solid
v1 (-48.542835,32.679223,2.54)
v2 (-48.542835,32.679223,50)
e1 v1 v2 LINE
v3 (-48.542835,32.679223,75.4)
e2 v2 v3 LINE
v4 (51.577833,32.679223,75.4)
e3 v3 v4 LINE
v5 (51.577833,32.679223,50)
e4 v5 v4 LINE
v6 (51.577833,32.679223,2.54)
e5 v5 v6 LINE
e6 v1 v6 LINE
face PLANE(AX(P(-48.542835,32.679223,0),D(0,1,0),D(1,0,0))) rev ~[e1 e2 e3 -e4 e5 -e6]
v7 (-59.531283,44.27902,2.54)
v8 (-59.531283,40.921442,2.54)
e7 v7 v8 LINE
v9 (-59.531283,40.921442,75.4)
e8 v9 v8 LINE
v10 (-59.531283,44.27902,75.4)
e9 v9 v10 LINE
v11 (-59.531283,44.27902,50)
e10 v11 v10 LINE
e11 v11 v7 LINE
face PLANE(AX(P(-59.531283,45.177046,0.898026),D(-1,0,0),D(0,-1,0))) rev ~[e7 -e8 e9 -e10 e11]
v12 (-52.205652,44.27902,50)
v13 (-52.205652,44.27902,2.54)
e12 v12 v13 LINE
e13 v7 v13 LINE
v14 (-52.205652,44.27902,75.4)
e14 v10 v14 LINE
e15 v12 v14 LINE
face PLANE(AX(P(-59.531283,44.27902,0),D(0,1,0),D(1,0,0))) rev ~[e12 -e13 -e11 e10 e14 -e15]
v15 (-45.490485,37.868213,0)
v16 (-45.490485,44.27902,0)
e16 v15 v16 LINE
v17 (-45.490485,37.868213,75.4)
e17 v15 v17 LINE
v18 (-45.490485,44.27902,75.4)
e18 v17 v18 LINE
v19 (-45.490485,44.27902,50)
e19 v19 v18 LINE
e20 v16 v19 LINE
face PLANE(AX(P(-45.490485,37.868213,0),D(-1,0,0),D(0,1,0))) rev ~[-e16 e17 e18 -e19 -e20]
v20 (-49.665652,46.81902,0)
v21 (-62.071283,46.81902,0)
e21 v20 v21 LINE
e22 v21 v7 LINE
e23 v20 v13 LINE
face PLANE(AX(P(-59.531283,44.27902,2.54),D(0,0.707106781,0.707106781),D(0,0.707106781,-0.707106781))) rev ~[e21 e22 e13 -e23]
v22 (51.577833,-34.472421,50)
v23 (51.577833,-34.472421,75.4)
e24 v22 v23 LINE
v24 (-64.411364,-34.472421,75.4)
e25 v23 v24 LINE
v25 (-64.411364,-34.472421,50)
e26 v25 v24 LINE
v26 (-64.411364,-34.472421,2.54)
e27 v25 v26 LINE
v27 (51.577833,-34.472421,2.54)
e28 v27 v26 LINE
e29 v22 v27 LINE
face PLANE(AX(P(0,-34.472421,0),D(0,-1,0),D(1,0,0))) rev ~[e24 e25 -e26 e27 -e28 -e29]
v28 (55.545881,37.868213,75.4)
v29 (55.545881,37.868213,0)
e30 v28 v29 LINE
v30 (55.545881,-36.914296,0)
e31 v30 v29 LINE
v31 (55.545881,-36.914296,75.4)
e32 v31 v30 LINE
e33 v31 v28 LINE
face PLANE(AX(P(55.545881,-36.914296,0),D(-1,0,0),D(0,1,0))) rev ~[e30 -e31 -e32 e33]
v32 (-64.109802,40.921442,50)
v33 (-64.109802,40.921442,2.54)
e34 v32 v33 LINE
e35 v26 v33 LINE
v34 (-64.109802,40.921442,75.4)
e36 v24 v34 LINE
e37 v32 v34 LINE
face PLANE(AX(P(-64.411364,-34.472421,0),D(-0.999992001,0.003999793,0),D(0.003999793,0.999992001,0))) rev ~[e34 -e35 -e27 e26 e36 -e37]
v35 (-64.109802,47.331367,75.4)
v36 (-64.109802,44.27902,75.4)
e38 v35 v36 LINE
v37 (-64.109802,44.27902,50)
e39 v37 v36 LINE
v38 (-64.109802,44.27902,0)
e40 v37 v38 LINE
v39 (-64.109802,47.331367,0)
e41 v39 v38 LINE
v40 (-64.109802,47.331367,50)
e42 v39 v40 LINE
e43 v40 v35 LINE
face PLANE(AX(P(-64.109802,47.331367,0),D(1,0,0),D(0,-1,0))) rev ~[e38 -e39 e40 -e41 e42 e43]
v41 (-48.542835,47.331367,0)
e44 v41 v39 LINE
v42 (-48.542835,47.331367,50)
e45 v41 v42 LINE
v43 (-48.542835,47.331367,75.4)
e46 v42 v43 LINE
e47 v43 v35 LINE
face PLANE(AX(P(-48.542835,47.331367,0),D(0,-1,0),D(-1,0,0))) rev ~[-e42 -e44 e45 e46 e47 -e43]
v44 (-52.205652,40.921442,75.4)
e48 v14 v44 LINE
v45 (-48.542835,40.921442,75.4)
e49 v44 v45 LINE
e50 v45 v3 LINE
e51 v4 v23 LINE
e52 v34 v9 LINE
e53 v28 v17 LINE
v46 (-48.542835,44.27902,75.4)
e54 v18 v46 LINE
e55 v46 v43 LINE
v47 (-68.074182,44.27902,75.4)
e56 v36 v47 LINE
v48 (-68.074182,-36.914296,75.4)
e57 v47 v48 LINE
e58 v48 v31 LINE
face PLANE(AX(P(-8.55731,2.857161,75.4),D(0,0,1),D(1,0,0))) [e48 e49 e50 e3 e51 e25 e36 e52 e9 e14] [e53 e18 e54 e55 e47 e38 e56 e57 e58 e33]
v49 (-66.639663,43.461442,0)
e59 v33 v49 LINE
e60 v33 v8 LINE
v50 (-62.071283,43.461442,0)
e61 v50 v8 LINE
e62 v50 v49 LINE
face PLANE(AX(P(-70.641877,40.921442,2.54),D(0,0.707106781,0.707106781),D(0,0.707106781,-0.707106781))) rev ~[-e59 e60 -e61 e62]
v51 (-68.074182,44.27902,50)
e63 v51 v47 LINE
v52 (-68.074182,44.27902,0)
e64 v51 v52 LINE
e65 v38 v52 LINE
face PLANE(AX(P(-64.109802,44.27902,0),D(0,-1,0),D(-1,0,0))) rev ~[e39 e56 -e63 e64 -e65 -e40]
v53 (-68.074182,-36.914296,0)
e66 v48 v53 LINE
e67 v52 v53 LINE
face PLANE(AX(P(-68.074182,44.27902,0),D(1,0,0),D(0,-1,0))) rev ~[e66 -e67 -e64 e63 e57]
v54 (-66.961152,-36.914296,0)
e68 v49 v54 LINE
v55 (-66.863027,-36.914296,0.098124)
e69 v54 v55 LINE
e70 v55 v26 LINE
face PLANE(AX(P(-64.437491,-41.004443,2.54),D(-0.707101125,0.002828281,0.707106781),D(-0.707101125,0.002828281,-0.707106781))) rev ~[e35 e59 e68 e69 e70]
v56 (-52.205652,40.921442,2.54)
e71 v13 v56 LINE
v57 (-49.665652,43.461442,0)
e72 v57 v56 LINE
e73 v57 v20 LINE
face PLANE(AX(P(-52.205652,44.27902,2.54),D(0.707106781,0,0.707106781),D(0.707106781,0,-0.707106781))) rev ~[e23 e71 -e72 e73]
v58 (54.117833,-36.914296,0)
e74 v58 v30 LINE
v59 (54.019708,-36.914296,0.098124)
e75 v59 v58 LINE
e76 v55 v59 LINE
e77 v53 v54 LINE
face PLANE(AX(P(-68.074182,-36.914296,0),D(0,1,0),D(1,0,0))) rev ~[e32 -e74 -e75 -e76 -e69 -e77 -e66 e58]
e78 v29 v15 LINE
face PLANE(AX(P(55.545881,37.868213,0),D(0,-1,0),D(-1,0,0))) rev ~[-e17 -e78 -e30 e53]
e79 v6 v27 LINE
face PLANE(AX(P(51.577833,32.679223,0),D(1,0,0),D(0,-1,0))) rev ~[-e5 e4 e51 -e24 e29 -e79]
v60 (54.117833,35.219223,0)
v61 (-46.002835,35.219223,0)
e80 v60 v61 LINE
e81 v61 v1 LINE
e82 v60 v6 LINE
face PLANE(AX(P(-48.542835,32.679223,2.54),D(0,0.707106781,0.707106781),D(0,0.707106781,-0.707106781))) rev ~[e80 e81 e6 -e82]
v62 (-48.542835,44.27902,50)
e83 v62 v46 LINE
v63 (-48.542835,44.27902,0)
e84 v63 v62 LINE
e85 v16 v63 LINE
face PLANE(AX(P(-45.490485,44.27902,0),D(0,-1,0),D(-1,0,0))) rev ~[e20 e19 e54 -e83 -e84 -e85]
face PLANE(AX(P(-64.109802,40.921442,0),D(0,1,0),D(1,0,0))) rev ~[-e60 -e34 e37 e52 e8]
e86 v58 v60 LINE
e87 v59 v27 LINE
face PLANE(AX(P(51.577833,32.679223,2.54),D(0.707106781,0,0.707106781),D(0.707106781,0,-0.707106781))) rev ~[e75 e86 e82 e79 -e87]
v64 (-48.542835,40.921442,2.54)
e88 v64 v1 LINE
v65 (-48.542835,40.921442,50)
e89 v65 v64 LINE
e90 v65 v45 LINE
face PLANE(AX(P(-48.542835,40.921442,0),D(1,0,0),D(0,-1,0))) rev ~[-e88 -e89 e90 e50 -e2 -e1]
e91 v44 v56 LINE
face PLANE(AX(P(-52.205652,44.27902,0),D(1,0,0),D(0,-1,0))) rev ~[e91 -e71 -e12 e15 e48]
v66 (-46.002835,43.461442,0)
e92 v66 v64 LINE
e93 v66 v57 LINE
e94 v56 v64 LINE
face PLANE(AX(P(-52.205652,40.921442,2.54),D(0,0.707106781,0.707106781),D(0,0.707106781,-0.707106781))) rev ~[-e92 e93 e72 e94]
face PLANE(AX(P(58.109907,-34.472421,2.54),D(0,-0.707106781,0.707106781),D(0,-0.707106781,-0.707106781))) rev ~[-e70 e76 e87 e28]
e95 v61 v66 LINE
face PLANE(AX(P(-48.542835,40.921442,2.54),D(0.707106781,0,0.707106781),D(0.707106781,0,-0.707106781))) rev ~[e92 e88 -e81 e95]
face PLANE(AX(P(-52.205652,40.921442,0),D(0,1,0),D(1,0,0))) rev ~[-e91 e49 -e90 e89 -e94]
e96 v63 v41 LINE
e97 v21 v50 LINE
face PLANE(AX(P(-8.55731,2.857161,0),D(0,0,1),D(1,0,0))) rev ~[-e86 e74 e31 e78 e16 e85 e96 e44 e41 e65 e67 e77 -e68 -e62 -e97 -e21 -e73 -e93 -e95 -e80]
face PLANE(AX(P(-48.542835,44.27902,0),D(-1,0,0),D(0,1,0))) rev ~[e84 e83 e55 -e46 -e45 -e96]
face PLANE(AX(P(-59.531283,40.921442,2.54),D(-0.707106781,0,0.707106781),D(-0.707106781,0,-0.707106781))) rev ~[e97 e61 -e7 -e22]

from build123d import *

# Parameters (mm, degrees)
F1_DEPTH      = 50
F2_DEPTH      = 25.4
F4_T1_DEPTH   = 7.325630635
F4_T3_DEPTH   = 9.8896528584
F4_T5_DEPTH   = 10.1948919696
F4_T7_DEPTH   = 14.7742944759
F4_T9_DEPTH   = 106.6527421576
F4_T11_DEPTH  = 67.1516433358
F4_T16_DEPTH  = 88.4586156969
F4_T22_DEPTH  = 17.6426691914
F4_T27_DEPTH  = 122.521271835
F4_T33_DEPTH  = 88.4586156969
F4_T38_DEPTH  = 122.521271835
F4_T47_DEPTH  = 88.4586156969
F4_T53_DEPTH  = 11.110594402
F4_T61_DEPTH  = 88.4586156969
F4_T66_DEPTH  = 11.110594402
F4_T74_DEPTH  = 13.8577054245
F4_T79_DEPTH  = 9.8896528584
F4_T87_DEPTH  = 9.8896528584
F4_T92_DEPTH  = 13.8577054245
F4_T100_DEPTH = 14.7742944759
F4_T105_DEPTH = 10.1948919696
F4_T113_DEPTH = 73.6837181253
F4_T118_DEPTH = 106.6527421576
F4_T126_DEPTH = 129.0533466244
F4_T132_DEPTH = 73.6837181253


# Not quite as in the source:
# - a fillet or chamfer that OpenCascade refuses, or shapes differently, is made with other operations: its cross-section is extruded or revolved along the edge and cut away or added
# - a feature of the source that left no trace in its solid (it failed there, or was rolled back) is left out


with BuildPart() as f1:
    # F0 (on Top) → F1 (new body)
    with BuildSketch(Plane.XY):
        Polygon((55.5458813906, -34.4724208117), (55.5458813906, 37.8682129085), (-45.4904846847, 37.8682129085), (-45.4904846847, 44.2790202796), (-48.5428348184, 44.2790202796), (-48.5428348184, 47.331366688), (-64.1098022461, 47.331366688), (-64.1098022461, 44.2790202796), (-68.0741816759, 44.2790202796), (-68.0741816759, 37.8682129085), (-68.0741816759, 32.6792225242), (-68.0741816759, -36.9142964482), (55.5458813906, -36.9142964482), align=None)
        Polygon((-48.5428348184, 32.6792225242), (51.5778325498, 32.6792225242), (51.5778325498, -34.4724208117), (-64.4113644958, -34.4724208117), (-64.1098022461, 40.9214422107), (-59.5312826335, 40.9214422107), (-59.5312826335, 44.2790202796), (-52.2056519985, 44.2790202796), (-52.2056519985, 40.9214422107), (-48.5428348184, 40.9214422107), align=None, mode=Mode.SUBTRACT)
    extrude(amount=F1_DEPTH)

    # F0 (on Top) + F1_face (on face) → F2 (join)
    with BuildSketch(Plane.XY):
        Polygon((55.5458813906, -34.4724208117), (55.5458813906, 37.8682129085), (-45.4904846847, 37.8682129085), (-45.4904846847, 44.2790202796), (-48.5428348184, 44.2790202796), (-48.5428348184, 47.331366688), (-64.1098022461, 47.331366688), (-64.1098022461, 44.2790202796), (-68.0741816759, 44.2790202796), (-68.0741816759, 37.8682129085), (-68.0741816759, 32.6792225242), (-68.0741816759, -36.9142964482), (55.5458813906, -36.9142964482), align=None)
        Polygon((-48.5428348184, 32.6792225242), (51.5778325498, 32.6792225242), (51.5778325498, -34.4724208117), (-64.4113644958, -34.4724208117), (-64.1098022461, 40.9214422107), (-59.5312826335, 40.9214422107), (-59.5312826335, 44.2790202796), (-52.2056519985, 44.2790202796), (-52.2056519985, 40.9214422107), (-48.5428348184, 40.9214422107), align=None, mode=Mode.SUBTRACT)
    with BuildSketch(Plane(origin=(-7.1792836418, 9.1982220042, 50), x_dir=(1, 0, 0), z_dir=(0, 0, 1))):
        Polygon((62.7251650324, -46.1125184524), (62.7251650324, 28.6699909043), (-38.3112010429, 28.6699909043), (-38.3112010429, 35.0807982755), (-41.3635511765, 35.0807982755), (-41.3635511765, 38.1331446838), (-56.9305186042, 38.1331446838), (-56.9305186042, 35.0807982755), (-60.8948980341, 35.0807982755), (-60.8948980341, -46.1125184524), align=None)
        Polygon((-56.9305186042, 31.7232202065), (-52.3519989917, 31.7232202065), (-52.3519989917, 35.0807982755), (-45.0263683567, 35.0807982755), (-45.0263683567, 31.7232202065), (-41.3635511765, 31.7232202065), (-41.3635511765, 23.48100052), (58.7571161917, 23.48100052), (58.7571161917, -43.6706428158), (-57.2320808539, -43.6706428158), align=None, mode=Mode.SUBTRACT)
    extrude(amount=F2_DEPTH)

    # F4: chamfer of 2.54 on 10 edges, made by hand

    # F4_s2 → F4_t1 (cut)
    with BuildSketch(Plane.YZ.offset(-59.5312826335)):
        Polygon((44.2790202796, 2.54), (46.8190202796, 0), (44.2790202796, 0), align=None)
    extrude(amount=F4_T1_DEPTH, mode=Mode.SUBTRACT)

    # F4_s4 → F4_t3 (cut)
    with BuildSketch(Plane.XZ.offset(-44.2790202796)):
        Polygon((-59.5312826335, 2.54), (-62.0712826335, 0), (-59.5312826335, 0), align=None)
        Polygon((-52.2056519985, 2.54), (-49.6656519985, 0), (-52.2056519985, 0), align=None)
    extrude(amount=F4_T3_DEPTH, mode=Mode.SUBTRACT)

    # F4_s6 → F4_t5 (cut)
    with BuildSketch(Plane.YZ.offset(-58.737726788)):
        Polygon((40.9214422107, 2.54), (43.4614422107, 0), (40.9214422107, 0), align=None)
    extrude(amount=F4_T5_DEPTH, mode=Mode.SUBTRACT)

    # F4_s8 → F4_t7 (cut)
    with BuildSketch(Plane.XZ.offset(-40.9214422107)):
        Polygon((-48.5428348184, 2.54), (-46.0028348184, 0), (-48.5428348184, 0), align=None)
    extrude(amount=F4_T7_DEPTH, mode=Mode.SUBTRACT)

    # F4_s10 → F4_t9 (cut)
    with BuildSketch(Plane.YZ.offset(-55.0749096078)):
        Polygon((32.6792225242, 2.54), (35.2192225242, 0), (32.6792225242, 0), align=None)
    extrude(amount=F4_T9_DEPTH, mode=Mode.SUBTRACT)

    # F4_s12 → F4_t11 (cut)
    with BuildSketch(Plane.XZ.offset(-32.6792225242)):
        Polygon((51.5778325498, 2.54), (54.1178325498, 0), (51.5778325498, 0), align=None)
    extrude(amount=F4_T11_DEPTH, mode=Mode.SUBTRACT)


with BuildPart() as f4_tool14:
    # F4_s15 → F4_t16 (new body)
    with BuildSketch(Plane(origin=(-0.1650388622, -41.2615219051, 0), x_dir=(0, 0, 1), z_dir=(0.0039997929, 0.9999920008, 0))):
        Polygon((2.54, -64.2729667124), (0, -66.8129667124), (0, -64.2729667124), align=None)
    extrude(amount=F4_T16_DEPTH)

    split(bisect_by=Plane.XZ.offset(34.4724208117), keep=Keep.BOTTOM)

    split(bisect_by=Plane.XZ.offset(-40.9214422107), keep=Keep.TOP)


with BuildPart() as f1_1:
    add(f1.part)

    # F4_t13: cut F4_tool14
    add(f4_tool14.part, mode=Mode.SUBTRACT)


with BuildPart() as f4_tool20:
    # F4_s21 → F4_t22 (new body)
    with BuildSketch(Plane.YZ.offset(-70.6418770355)):
        Polygon((40.9214422107, 2.54), (43.4614422107, 0), (40.9214422107, 0), align=None)
    extrude(amount=F4_T22_DEPTH)

    split(bisect_by=Plane(origin=(-64.2724525799, 0.2570785554, 0), x_dir=(0, 0, 1), z_dir=(0.9999920008, -0.0039997929, 0)), keep=Keep.TOP)


with BuildPart() as f1_2:
    add(f1_1.part)

    # F4_t19: cut F4_tool20
    add(f4_tool20.part, mode=Mode.SUBTRACT)


with BuildPart() as f4_tool25:
    # F4_s26 → F4_t27 (new body)
    with BuildSketch(Plane.YZ.offset(51.5778325498)):
        Polygon((-34.4724208117, 2.54), (-37.0124208117, 0), (-34.4724208117, 0), align=None)
    extrude(amount=-F4_T27_DEPTH)

    split(bisect_by=Plane(origin=(-64.2724525799, 0.2570785554, 0), x_dir=(0, 0, 1), z_dir=(0.9999920008, -0.0039997929, 0)), keep=Keep.TOP)


with BuildPart() as f1_3:
    add(f1_2.part)

    # F4_t24: cut F4_tool25
    add(f4_tool25.part, mode=Mode.SUBTRACT)


with BuildPart() as f4_tool31:
    # F4_s32 → F4_t33 (new body)
    with BuildSketch(Plane(origin=(-0.1650388622, -41.2615219051, 0), x_dir=(0, 0, 1), z_dir=(0.0039997929, 0.9999920008, 0))):
        Polygon((2.54, -64.2729667124), (0, -66.8129667124), (0, -64.2729667124), align=None)
    extrude(amount=F4_T33_DEPTH)

    split(bisect_by=Plane.XZ.offset(34.4724208117), keep=Keep.TOP)

    split(bisect_by=Plane.XZ.offset(36.9142964482), keep=Keep.BOTTOM)


with BuildPart() as f4_tool36:
    # F4_s37 → F4_t38 (new body)
    with BuildSketch(Plane.YZ.offset(51.5778325498)):
        Polygon((-34.4724208117, 2.54), (-37.0124208117, 0), (-34.4724208117, 0), align=None)
    extrude(amount=-F4_T38_DEPTH)

    split(bisect_by=Plane(origin=(-64.2724525799, 0.2570785554, 0), x_dir=(0, 0, 1), z_dir=(-0.9999920008, 0.0039997929, 0)), keep=Keep.TOP)

    split(bisect_by=Plane.YZ.offset(-68.0741816759), keep=Keep.TOP)

    split(bisect_by=Plane.XZ.offset(36.9142964482), keep=Keep.BOTTOM)


with BuildPart() as f4_tool31_1:
    add(f4_tool31.part)

    # F4_t42: intersect F4_tool36
    add(f4_tool36.part, mode=Mode.INTERSECT)


with BuildPart() as f1_4:
    add(f1_3.part)

    # F4_t29: cut F4_tool31
    add(f4_tool31_1.part, mode=Mode.SUBTRACT)


with BuildPart() as f4_tool45:
    # F4_s46 → F4_t47 (new body)
    with BuildSketch(Plane(origin=(-0.1650388622, -41.2615219051, 0), x_dir=(0, 0, 1), z_dir=(0.0039997929, 0.9999920008, 0))):
        Polygon((2.54, -64.2729667124), (0, -66.8129667124), (0, -64.2729667124), align=None)
    extrude(amount=F4_T47_DEPTH)

    split(bisect_by=Plane.XZ.offset(-40.9214422107), keep=Keep.BOTTOM)

    split(bisect_by=Plane.XZ.offset(-44.2790202796), keep=Keep.TOP)

    split(bisect_by=Plane.YZ.offset(-64.1098022461), keep=Keep.BOTTOM)


with BuildPart() as f4_tool51:
    # F4_s52 → F4_t53 (new body)
    with BuildSketch(Plane.YZ.offset(-70.6418770355)):
        Polygon((40.9214422107, 2.54), (43.4614422107, 0), (40.9214422107, 0), align=None)
    extrude(amount=F4_T53_DEPTH)

    split(bisect_by=Plane(origin=(-64.2724525799, 0.2570785554, 0), x_dir=(0, 0, 1), z_dir=(-0.9999920008, 0.0039997929, 0)), keep=Keep.TOP)

    split(bisect_by=Plane.YZ.offset(-68.0741816759), keep=Keep.TOP)


with BuildPart() as f4_tool45_1:
    add(f4_tool45.part)

    # F4_t56: intersect F4_tool51
    add(f4_tool51.part, mode=Mode.INTERSECT)


with BuildPart() as f1_5:
    add(f1_4.part)

    # F4_t43: cut F4_tool45
    add(f4_tool45_1.part, mode=Mode.SUBTRACT)


with BuildPart() as f4_tool59:
    # F4_s60 → F4_t61 (new body)
    with BuildSketch(Plane(origin=(-0.1650388622, -41.2615219051, 0), x_dir=(0, 0, 1), z_dir=(0.0039997929, 0.9999920008, 0))):
        Polygon((2.54, -64.2729667124), (0, -66.8129667124), (0, -64.2729667124), align=None)
    extrude(amount=F4_T61_DEPTH)

    split(bisect_by=Plane.XZ.offset(-44.2790202796), keep=Keep.TOP)

    split(bisect_by=Plane.YZ.offset(-64.1098022461), keep=Keep.TOP)


with BuildPart() as f4_tool64:
    # F4_s65 → F4_t66 (new body)
    with BuildSketch(Plane.YZ.offset(-70.6418770355)):
        Polygon((40.9214422107, 2.54), (43.4614422107, 0), (40.9214422107, 0), align=None)
    extrude(amount=F4_T66_DEPTH)

    split(bisect_by=Plane(origin=(-64.2724525799, 0.2570785554, 0), x_dir=(0, 0, 1), z_dir=(-0.9999920008, 0.0039997929, 0)), keep=Keep.TOP)

    split(bisect_by=Plane.YZ.offset(-68.0741816759), keep=Keep.TOP)


with BuildPart() as f4_tool59_1:
    add(f4_tool59.part)

    # F4_t69: intersect F4_tool64
    add(f4_tool64.part, mode=Mode.INTERSECT)


with BuildPart() as f1_6:
    add(f1_5.part)

    # F4_t57: cut F4_tool59
    add(f4_tool59_1.part, mode=Mode.SUBTRACT)


with BuildPart() as f4_tool72:
    # F4_s73 → F4_t74 (new body)
    with BuildSketch(Plane.YZ.offset(-66.063357423)):
        Polygon((44.2790202796, 2.54), (46.8190202796, 0), (44.2790202796, 0), align=None)
    extrude(amount=F4_T74_DEPTH)

    split(bisect_by=Plane.YZ.offset(-59.5312826335), keep=Keep.BOTTOM)

    split(bisect_by=Plane.YZ.offset(-64.1098022461), keep=Keep.TOP)


with BuildPart() as f4_tool77:
    # F4_s78 → F4_t79 (new body)
    with BuildSketch(Plane.XZ.offset(-40.9214422107)):
        Polygon((-59.5312826335, 2.54), (-62.0712826335, 0), (-59.5312826335, 0), align=None)
    extrude(amount=-F4_T79_DEPTH)

    split(bisect_by=Plane.XZ.offset(-44.2790202796), keep=Keep.BOTTOM)

    split(bisect_by=Plane.XZ.offset(-47.331366688), keep=Keep.TOP)


with BuildPart() as f4_tool72_1:
    add(f4_tool72.part)

    # F4_t82: intersect F4_tool77
    add(f4_tool77.part, mode=Mode.INTERSECT)


with BuildPart() as f1_7:
    add(f1_6.part)

    # F4_t70: cut F4_tool72
    add(f4_tool72_1.part, mode=Mode.SUBTRACT)


with BuildPart() as f4_tool85:
    # F4_s86 → F4_t87 (new body)
    with BuildSketch(Plane.XZ.offset(-50.8110950691)):
        Polygon((-52.2056519985, 2.54), (-49.6656519985, 0), (-52.2056519985, 0), align=None)
    extrude(amount=F4_T87_DEPTH)

    split(bisect_by=Plane.XZ.offset(-44.2790202796), keep=Keep.BOTTOM)

    split(bisect_by=Plane.XZ.offset(-47.331366688), keep=Keep.TOP)


with BuildPart() as f4_tool90:
    # F4_s91 → F4_t92 (new body)
    with BuildSketch(Plane.YZ.offset(-59.5312826335)):
        Polygon((44.2790202796, 2.54), (46.8190202796, 0), (44.2790202796, 0), align=None)
    extrude(amount=F4_T92_DEPTH)

    split(bisect_by=Plane.YZ.offset(-52.2056519985), keep=Keep.TOP)

    split(bisect_by=Plane.YZ.offset(-48.5428348184), keep=Keep.BOTTOM)


with BuildPart() as f4_tool85_1:
    add(f4_tool85.part)

    # F4_t95: intersect F4_tool90
    add(f4_tool90.part, mode=Mode.INTERSECT)


with BuildPart() as f1_8:
    add(f1_7.part)

    # F4_t83: cut F4_tool85
    add(f4_tool85_1.part, mode=Mode.SUBTRACT)


with BuildPart() as f4_tool98:
    # F4_s99 → F4_t100 (new body)
    with BuildSketch(Plane.XZ.offset(-47.4535170001)):
        Polygon((-48.5428348184, 2.54), (-46.0028348184, 0), (-48.5428348184, 0), align=None)
    extrude(amount=F4_T100_DEPTH)

    split(bisect_by=Plane.XZ.offset(-40.9214422107), keep=Keep.BOTTOM)

    split(bisect_by=Plane.XZ.offset(-44.2790202796), keep=Keep.TOP)


with BuildPart() as f4_tool103:
    # F4_s104 → F4_t105 (new body)
    with BuildSketch(Plane.YZ.offset(-52.2056519985)):
        Polygon((40.9214422107, 2.54), (43.4614422107, 0), (40.9214422107, 0), align=None)
    extrude(amount=F4_T105_DEPTH)

    split(bisect_by=Plane.YZ.offset(-48.5428348184), keep=Keep.TOP)

    split(bisect_by=Plane.YZ.offset(-45.4904846847), keep=Keep.BOTTOM)


with BuildPart() as f4_tool98_1:
    add(f4_tool98.part)

    # F4_t108: intersect F4_tool103
    add(f4_tool103.part, mode=Mode.INTERSECT)


with BuildPart() as f1_9:
    add(f1_8.part)

    # F4_t96: cut F4_tool98
    add(f4_tool98_1.part, mode=Mode.SUBTRACT)


with BuildPart() as f4_tool111:
    # F4_s112 → F4_t113 (new body)
    with BuildSketch(Plane.XZ.offset(-39.2112973136)):
        Polygon((51.5778325498, 2.54), (54.1178325498, 0), (51.5778325498, 0), align=None)
    extrude(amount=F4_T113_DEPTH)

    split(bisect_by=Plane.XZ.offset(-32.6792225242), keep=Keep.BOTTOM)

    split(bisect_by=Plane.XZ.offset(-37.8682129085), keep=Keep.TOP)


with BuildPart() as f4_tool116:
    # F4_s117 → F4_t118 (new body)
    with BuildSketch(Plane.YZ.offset(-48.5428348184)):
        Polygon((32.6792225242, 2.54), (35.2192225242, 0), (32.6792225242, 0), align=None)
    extrude(amount=F4_T118_DEPTH)

    split(bisect_by=Plane.YZ.offset(55.5458813906), keep=Keep.BOTTOM)

    split(bisect_by=Plane.YZ.offset(51.5778325498), keep=Keep.TOP)


with BuildPart() as f4_tool111_1:
    add(f4_tool111.part)

    # F4_t121: intersect F4_tool116
    add(f4_tool116.part, mode=Mode.INTERSECT)


with BuildPart() as f1_10:
    add(f1_9.part)

    # F4_t109: cut F4_tool111
    add(f4_tool111_1.part, mode=Mode.SUBTRACT)


with BuildPart() as f4_tool124:
    # F4_s125 → F4_t126 (new body)
    with BuildSketch(Plane.YZ.offset(58.1099073392)):
        Polygon((-34.4724208117, 2.54), (-37.0124208117, 0), (-34.4724208117, 0), align=None)
    extrude(amount=-F4_T126_DEPTH)

    split(bisect_by=Plane.YZ.offset(55.5458813906), keep=Keep.BOTTOM)

    split(bisect_by=Plane.YZ.offset(51.5778325498), keep=Keep.TOP)

    split(bisect_by=Plane.XZ.offset(36.9142964482), keep=Keep.BOTTOM)


with BuildPart() as f4_tool130:
    # F4_s131 → F4_t132 (new body)
    with BuildSketch(Plane.XZ.offset(-32.6792225242)):
        Polygon((51.5778325498, 2.54), (54.1178325498, 0), (51.5778325498, 0), align=None)
    extrude(amount=F4_T132_DEPTH)

    split(bisect_by=Plane.XZ.offset(34.4724208117), keep=Keep.TOP)

    split(bisect_by=Plane.XZ.offset(36.9142964482), keep=Keep.BOTTOM)


with BuildPart() as f4_tool124_1:
    add(f4_tool124.part)

    # F4_t135: intersect F4_tool130
    add(f4_tool130.part, mode=Mode.INTERSECT)


with BuildPart() as f1_11:
    add(f1_10.part)

    # F4_t122: cut F4_tool124
    add(f4_tool124_1.part, mode=Mode.SUBTRACT)


solid = f1_11.part
